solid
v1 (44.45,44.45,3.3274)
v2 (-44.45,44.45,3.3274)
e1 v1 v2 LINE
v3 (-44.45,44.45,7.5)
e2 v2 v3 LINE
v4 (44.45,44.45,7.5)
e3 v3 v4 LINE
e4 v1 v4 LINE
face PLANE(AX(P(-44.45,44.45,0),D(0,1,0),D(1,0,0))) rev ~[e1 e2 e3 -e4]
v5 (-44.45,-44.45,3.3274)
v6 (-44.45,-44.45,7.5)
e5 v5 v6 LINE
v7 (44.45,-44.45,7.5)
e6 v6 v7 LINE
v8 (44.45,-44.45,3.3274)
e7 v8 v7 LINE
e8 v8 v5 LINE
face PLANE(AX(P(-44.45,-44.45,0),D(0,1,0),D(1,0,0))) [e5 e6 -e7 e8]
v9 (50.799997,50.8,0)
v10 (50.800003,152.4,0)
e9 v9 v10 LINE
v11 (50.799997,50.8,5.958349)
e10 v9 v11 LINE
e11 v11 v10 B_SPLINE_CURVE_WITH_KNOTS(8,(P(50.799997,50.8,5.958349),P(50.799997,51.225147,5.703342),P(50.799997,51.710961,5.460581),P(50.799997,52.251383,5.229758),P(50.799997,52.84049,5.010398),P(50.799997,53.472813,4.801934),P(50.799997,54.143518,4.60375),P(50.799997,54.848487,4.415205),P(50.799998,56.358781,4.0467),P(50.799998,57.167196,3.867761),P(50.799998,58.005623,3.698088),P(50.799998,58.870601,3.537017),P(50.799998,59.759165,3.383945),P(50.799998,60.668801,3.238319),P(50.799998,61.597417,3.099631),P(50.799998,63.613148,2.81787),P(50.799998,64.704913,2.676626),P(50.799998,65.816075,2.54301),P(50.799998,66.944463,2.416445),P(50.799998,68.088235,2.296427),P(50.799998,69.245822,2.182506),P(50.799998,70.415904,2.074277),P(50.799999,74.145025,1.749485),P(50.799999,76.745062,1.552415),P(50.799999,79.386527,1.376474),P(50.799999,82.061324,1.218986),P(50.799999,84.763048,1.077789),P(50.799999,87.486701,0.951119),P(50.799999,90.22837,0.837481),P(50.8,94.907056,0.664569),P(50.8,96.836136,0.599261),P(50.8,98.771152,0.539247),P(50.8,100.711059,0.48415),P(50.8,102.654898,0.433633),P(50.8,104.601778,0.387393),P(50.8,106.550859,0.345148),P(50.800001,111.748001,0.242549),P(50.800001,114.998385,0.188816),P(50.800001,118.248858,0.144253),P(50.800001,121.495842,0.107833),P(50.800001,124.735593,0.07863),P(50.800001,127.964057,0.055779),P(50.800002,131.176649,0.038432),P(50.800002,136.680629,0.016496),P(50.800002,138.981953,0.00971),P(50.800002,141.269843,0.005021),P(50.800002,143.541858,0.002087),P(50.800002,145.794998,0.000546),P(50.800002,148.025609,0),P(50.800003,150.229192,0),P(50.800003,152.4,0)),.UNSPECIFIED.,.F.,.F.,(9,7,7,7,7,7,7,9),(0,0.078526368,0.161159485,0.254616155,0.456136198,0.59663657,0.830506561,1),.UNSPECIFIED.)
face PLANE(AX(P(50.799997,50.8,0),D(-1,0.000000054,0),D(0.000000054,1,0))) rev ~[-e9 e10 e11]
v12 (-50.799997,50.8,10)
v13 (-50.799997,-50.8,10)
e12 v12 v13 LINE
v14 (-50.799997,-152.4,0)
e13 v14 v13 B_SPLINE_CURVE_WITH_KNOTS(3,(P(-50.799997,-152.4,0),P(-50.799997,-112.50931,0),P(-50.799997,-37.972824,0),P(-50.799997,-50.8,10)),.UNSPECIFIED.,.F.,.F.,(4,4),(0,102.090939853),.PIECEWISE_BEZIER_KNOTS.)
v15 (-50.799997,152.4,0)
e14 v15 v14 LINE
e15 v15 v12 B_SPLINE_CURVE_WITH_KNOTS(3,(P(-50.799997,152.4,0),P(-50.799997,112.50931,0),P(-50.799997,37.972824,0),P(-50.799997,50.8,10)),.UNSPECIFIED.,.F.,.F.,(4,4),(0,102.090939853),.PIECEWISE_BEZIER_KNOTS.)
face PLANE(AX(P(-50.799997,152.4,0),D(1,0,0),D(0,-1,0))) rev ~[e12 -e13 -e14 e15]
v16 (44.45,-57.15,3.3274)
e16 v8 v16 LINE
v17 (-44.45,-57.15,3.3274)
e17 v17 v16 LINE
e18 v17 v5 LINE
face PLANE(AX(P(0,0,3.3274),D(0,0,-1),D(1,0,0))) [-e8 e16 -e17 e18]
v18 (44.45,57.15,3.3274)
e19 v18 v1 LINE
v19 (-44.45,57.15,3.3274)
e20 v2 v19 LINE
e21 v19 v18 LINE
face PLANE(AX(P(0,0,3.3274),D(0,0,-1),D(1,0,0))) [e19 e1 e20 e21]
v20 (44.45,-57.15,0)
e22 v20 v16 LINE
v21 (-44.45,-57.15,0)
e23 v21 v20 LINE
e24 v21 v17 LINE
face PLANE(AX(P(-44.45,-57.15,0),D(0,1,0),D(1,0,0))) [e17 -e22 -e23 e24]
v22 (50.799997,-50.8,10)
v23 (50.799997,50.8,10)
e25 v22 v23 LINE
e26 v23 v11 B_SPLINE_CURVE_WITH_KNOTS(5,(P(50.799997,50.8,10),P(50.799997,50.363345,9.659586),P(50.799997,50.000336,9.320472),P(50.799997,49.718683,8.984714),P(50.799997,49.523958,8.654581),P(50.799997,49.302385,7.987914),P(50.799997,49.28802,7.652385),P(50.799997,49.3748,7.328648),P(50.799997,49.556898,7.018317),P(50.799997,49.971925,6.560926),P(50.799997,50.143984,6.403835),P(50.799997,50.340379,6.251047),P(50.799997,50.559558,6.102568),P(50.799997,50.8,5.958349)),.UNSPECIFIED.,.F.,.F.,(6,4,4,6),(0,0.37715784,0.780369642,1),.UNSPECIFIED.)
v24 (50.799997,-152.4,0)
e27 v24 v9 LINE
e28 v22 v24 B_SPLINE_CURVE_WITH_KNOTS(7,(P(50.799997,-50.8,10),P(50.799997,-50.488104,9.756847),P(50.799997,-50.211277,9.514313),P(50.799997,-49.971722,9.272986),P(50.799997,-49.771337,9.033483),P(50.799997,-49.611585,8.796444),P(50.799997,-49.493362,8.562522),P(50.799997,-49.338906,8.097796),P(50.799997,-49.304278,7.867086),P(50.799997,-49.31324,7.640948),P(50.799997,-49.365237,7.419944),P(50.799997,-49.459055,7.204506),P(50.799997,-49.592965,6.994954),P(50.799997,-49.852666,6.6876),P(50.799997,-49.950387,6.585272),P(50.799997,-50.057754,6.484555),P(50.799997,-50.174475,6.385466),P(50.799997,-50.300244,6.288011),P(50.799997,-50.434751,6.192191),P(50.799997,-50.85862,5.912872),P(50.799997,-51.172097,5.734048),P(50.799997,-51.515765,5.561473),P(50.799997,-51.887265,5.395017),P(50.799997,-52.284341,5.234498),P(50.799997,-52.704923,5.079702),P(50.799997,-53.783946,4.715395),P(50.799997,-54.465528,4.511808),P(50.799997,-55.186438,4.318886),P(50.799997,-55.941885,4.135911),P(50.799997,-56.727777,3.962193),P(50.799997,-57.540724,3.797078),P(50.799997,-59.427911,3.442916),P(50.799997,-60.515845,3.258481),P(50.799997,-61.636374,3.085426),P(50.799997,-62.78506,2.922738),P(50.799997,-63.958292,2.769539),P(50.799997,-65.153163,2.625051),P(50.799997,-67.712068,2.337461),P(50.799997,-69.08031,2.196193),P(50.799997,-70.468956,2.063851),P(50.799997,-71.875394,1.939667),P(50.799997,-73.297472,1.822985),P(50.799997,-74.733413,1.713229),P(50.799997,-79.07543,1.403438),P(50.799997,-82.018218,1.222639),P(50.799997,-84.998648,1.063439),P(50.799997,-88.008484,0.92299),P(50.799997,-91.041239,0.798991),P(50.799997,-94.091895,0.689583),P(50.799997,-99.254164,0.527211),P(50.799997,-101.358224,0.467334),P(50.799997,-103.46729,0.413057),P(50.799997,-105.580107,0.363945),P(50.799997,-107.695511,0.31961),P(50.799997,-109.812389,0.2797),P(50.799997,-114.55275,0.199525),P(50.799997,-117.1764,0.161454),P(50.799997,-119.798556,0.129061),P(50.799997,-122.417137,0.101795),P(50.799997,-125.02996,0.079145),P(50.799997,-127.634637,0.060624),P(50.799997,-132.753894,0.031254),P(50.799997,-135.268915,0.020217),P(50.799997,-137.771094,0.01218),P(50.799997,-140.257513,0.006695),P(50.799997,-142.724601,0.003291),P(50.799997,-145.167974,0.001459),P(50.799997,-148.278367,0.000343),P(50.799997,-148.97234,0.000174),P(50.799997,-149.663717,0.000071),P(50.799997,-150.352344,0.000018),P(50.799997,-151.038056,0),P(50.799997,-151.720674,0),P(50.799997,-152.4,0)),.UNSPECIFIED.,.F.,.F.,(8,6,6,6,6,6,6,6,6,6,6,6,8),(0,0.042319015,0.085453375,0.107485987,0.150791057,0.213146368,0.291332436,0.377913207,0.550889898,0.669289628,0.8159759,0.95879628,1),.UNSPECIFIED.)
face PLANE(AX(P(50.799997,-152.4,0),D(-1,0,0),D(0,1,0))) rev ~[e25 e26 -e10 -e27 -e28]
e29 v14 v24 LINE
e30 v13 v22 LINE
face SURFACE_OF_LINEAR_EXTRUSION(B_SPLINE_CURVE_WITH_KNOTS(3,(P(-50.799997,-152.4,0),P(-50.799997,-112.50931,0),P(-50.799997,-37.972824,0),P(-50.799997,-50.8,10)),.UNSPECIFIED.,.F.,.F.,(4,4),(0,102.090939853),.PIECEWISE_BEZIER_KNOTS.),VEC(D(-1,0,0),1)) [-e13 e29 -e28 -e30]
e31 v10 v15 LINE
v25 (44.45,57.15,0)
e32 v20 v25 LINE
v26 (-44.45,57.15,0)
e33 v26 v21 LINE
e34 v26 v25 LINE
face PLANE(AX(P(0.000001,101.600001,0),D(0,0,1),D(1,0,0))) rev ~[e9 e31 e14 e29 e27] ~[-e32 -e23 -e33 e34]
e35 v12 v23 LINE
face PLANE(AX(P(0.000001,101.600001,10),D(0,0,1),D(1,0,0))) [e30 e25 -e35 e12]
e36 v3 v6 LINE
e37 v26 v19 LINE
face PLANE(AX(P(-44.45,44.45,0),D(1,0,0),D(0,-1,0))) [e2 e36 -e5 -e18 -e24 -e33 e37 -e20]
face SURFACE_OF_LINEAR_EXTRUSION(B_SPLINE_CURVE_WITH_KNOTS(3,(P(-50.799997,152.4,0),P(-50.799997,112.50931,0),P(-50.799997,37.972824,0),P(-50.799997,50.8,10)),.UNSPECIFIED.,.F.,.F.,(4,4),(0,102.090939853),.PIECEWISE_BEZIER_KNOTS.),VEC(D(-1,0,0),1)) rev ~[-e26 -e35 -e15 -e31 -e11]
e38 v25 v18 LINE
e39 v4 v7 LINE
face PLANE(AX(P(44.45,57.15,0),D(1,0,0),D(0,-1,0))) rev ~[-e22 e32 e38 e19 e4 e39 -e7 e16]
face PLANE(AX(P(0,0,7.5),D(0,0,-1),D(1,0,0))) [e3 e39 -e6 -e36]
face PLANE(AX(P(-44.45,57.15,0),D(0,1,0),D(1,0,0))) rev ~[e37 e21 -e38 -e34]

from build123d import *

# Parameters (mm, degrees)
F0_W     = 101.5999945464
F0_H     = 101.6
F1_DEPTH = 10
F2_W     = 88.9
F2_H     = 88.9
F3_DEPTH = 7.5
F4_W     = 88.9
F4_H     = 88.9
F4_H_2   = 12.7
F5_DEPTH = 3.3274
F7_DEPTH = 103.632


# Not quite as in the source:
# - ends of sketch curves that miss each other by under 0.0002 mm in the source are joined


with BuildPart() as f1:
    # F0 (on Top) → F1 (new body)
    with BuildSketch(Plane.XY):
        Polygon((-50.7999972732, 152.4), (-50.7999972732, 50.8), (50.7999972732, 50.8), (50.8000027268, 152.4), align=None)
        Rectangle(F0_W, F0_H)
        with Locations((0, -101.6)):
            Rectangle(F0_W, F0_H)
    extrude(amount=F1_DEPTH)

    # F2 (on face) → F3 (cut)
    with BuildSketch(Plane(origin=(0, 0, 0), x_dir=(1, 0, 0), z_dir=(0, 0, -1))):
        Rectangle(F2_W, F2_H)
    extrude(amount=-F3_DEPTH, mode=Mode.SUBTRACT)

    # F4 (on face) → F5 (cut)
    with BuildSketch(Plane(origin=(0, 0, 0), x_dir=(1, 0, 0), z_dir=(0, 0, -1))):
        Rectangle(F4_W, F4_H)
        with Locations((0, 50.8)):
            Rectangle(F4_W, F4_H_2)
        with Locations((0, -50.8)):
            Rectangle(F4_W, F4_H_2)
    extrude(amount=-F5_DEPTH, mode=Mode.SUBTRACT)

    # F6 (on face) → F7 (cut)
    with BuildSketch(Plane(origin=(-50.7999972732, 0, 0), x_dir=(0, -1, 0), z_dir=(-1, 0, 0))):
        with BuildLine():
            Line((-152.4, 10), (-152.4, 0))
            add(Edge.make_bspline(
                [(-152.4, 0), (-112.5093102455, 0), (-37.972824313, 0), (-50.8, 10)],
                knots=[0, 0, 0, 0, 102.0909398527, 102.0909398527, 102.0909398527, 102.0909398527], degree=3))
            Line((-50.8, 10), (-152.4, 10))
        make_face()
        with BuildLine():
            add(Edge.make_bspline(
                [(152.4, 0), (112.5093102455, 0), (37.972824313, 0), (50.8, 10)],
                knots=[0, 0, 0, 0, 102.0909398527, 102.0909398527, 102.0909398527, 102.0909398527], degree=3))
            Line((152.4, 0), (152.4, 10))
            Line((152.4, 10), (50.8, 10))
        make_face()
    extrude(amount=-F7_DEPTH, mode=Mode.SUBTRACT)


solid = f1.part
